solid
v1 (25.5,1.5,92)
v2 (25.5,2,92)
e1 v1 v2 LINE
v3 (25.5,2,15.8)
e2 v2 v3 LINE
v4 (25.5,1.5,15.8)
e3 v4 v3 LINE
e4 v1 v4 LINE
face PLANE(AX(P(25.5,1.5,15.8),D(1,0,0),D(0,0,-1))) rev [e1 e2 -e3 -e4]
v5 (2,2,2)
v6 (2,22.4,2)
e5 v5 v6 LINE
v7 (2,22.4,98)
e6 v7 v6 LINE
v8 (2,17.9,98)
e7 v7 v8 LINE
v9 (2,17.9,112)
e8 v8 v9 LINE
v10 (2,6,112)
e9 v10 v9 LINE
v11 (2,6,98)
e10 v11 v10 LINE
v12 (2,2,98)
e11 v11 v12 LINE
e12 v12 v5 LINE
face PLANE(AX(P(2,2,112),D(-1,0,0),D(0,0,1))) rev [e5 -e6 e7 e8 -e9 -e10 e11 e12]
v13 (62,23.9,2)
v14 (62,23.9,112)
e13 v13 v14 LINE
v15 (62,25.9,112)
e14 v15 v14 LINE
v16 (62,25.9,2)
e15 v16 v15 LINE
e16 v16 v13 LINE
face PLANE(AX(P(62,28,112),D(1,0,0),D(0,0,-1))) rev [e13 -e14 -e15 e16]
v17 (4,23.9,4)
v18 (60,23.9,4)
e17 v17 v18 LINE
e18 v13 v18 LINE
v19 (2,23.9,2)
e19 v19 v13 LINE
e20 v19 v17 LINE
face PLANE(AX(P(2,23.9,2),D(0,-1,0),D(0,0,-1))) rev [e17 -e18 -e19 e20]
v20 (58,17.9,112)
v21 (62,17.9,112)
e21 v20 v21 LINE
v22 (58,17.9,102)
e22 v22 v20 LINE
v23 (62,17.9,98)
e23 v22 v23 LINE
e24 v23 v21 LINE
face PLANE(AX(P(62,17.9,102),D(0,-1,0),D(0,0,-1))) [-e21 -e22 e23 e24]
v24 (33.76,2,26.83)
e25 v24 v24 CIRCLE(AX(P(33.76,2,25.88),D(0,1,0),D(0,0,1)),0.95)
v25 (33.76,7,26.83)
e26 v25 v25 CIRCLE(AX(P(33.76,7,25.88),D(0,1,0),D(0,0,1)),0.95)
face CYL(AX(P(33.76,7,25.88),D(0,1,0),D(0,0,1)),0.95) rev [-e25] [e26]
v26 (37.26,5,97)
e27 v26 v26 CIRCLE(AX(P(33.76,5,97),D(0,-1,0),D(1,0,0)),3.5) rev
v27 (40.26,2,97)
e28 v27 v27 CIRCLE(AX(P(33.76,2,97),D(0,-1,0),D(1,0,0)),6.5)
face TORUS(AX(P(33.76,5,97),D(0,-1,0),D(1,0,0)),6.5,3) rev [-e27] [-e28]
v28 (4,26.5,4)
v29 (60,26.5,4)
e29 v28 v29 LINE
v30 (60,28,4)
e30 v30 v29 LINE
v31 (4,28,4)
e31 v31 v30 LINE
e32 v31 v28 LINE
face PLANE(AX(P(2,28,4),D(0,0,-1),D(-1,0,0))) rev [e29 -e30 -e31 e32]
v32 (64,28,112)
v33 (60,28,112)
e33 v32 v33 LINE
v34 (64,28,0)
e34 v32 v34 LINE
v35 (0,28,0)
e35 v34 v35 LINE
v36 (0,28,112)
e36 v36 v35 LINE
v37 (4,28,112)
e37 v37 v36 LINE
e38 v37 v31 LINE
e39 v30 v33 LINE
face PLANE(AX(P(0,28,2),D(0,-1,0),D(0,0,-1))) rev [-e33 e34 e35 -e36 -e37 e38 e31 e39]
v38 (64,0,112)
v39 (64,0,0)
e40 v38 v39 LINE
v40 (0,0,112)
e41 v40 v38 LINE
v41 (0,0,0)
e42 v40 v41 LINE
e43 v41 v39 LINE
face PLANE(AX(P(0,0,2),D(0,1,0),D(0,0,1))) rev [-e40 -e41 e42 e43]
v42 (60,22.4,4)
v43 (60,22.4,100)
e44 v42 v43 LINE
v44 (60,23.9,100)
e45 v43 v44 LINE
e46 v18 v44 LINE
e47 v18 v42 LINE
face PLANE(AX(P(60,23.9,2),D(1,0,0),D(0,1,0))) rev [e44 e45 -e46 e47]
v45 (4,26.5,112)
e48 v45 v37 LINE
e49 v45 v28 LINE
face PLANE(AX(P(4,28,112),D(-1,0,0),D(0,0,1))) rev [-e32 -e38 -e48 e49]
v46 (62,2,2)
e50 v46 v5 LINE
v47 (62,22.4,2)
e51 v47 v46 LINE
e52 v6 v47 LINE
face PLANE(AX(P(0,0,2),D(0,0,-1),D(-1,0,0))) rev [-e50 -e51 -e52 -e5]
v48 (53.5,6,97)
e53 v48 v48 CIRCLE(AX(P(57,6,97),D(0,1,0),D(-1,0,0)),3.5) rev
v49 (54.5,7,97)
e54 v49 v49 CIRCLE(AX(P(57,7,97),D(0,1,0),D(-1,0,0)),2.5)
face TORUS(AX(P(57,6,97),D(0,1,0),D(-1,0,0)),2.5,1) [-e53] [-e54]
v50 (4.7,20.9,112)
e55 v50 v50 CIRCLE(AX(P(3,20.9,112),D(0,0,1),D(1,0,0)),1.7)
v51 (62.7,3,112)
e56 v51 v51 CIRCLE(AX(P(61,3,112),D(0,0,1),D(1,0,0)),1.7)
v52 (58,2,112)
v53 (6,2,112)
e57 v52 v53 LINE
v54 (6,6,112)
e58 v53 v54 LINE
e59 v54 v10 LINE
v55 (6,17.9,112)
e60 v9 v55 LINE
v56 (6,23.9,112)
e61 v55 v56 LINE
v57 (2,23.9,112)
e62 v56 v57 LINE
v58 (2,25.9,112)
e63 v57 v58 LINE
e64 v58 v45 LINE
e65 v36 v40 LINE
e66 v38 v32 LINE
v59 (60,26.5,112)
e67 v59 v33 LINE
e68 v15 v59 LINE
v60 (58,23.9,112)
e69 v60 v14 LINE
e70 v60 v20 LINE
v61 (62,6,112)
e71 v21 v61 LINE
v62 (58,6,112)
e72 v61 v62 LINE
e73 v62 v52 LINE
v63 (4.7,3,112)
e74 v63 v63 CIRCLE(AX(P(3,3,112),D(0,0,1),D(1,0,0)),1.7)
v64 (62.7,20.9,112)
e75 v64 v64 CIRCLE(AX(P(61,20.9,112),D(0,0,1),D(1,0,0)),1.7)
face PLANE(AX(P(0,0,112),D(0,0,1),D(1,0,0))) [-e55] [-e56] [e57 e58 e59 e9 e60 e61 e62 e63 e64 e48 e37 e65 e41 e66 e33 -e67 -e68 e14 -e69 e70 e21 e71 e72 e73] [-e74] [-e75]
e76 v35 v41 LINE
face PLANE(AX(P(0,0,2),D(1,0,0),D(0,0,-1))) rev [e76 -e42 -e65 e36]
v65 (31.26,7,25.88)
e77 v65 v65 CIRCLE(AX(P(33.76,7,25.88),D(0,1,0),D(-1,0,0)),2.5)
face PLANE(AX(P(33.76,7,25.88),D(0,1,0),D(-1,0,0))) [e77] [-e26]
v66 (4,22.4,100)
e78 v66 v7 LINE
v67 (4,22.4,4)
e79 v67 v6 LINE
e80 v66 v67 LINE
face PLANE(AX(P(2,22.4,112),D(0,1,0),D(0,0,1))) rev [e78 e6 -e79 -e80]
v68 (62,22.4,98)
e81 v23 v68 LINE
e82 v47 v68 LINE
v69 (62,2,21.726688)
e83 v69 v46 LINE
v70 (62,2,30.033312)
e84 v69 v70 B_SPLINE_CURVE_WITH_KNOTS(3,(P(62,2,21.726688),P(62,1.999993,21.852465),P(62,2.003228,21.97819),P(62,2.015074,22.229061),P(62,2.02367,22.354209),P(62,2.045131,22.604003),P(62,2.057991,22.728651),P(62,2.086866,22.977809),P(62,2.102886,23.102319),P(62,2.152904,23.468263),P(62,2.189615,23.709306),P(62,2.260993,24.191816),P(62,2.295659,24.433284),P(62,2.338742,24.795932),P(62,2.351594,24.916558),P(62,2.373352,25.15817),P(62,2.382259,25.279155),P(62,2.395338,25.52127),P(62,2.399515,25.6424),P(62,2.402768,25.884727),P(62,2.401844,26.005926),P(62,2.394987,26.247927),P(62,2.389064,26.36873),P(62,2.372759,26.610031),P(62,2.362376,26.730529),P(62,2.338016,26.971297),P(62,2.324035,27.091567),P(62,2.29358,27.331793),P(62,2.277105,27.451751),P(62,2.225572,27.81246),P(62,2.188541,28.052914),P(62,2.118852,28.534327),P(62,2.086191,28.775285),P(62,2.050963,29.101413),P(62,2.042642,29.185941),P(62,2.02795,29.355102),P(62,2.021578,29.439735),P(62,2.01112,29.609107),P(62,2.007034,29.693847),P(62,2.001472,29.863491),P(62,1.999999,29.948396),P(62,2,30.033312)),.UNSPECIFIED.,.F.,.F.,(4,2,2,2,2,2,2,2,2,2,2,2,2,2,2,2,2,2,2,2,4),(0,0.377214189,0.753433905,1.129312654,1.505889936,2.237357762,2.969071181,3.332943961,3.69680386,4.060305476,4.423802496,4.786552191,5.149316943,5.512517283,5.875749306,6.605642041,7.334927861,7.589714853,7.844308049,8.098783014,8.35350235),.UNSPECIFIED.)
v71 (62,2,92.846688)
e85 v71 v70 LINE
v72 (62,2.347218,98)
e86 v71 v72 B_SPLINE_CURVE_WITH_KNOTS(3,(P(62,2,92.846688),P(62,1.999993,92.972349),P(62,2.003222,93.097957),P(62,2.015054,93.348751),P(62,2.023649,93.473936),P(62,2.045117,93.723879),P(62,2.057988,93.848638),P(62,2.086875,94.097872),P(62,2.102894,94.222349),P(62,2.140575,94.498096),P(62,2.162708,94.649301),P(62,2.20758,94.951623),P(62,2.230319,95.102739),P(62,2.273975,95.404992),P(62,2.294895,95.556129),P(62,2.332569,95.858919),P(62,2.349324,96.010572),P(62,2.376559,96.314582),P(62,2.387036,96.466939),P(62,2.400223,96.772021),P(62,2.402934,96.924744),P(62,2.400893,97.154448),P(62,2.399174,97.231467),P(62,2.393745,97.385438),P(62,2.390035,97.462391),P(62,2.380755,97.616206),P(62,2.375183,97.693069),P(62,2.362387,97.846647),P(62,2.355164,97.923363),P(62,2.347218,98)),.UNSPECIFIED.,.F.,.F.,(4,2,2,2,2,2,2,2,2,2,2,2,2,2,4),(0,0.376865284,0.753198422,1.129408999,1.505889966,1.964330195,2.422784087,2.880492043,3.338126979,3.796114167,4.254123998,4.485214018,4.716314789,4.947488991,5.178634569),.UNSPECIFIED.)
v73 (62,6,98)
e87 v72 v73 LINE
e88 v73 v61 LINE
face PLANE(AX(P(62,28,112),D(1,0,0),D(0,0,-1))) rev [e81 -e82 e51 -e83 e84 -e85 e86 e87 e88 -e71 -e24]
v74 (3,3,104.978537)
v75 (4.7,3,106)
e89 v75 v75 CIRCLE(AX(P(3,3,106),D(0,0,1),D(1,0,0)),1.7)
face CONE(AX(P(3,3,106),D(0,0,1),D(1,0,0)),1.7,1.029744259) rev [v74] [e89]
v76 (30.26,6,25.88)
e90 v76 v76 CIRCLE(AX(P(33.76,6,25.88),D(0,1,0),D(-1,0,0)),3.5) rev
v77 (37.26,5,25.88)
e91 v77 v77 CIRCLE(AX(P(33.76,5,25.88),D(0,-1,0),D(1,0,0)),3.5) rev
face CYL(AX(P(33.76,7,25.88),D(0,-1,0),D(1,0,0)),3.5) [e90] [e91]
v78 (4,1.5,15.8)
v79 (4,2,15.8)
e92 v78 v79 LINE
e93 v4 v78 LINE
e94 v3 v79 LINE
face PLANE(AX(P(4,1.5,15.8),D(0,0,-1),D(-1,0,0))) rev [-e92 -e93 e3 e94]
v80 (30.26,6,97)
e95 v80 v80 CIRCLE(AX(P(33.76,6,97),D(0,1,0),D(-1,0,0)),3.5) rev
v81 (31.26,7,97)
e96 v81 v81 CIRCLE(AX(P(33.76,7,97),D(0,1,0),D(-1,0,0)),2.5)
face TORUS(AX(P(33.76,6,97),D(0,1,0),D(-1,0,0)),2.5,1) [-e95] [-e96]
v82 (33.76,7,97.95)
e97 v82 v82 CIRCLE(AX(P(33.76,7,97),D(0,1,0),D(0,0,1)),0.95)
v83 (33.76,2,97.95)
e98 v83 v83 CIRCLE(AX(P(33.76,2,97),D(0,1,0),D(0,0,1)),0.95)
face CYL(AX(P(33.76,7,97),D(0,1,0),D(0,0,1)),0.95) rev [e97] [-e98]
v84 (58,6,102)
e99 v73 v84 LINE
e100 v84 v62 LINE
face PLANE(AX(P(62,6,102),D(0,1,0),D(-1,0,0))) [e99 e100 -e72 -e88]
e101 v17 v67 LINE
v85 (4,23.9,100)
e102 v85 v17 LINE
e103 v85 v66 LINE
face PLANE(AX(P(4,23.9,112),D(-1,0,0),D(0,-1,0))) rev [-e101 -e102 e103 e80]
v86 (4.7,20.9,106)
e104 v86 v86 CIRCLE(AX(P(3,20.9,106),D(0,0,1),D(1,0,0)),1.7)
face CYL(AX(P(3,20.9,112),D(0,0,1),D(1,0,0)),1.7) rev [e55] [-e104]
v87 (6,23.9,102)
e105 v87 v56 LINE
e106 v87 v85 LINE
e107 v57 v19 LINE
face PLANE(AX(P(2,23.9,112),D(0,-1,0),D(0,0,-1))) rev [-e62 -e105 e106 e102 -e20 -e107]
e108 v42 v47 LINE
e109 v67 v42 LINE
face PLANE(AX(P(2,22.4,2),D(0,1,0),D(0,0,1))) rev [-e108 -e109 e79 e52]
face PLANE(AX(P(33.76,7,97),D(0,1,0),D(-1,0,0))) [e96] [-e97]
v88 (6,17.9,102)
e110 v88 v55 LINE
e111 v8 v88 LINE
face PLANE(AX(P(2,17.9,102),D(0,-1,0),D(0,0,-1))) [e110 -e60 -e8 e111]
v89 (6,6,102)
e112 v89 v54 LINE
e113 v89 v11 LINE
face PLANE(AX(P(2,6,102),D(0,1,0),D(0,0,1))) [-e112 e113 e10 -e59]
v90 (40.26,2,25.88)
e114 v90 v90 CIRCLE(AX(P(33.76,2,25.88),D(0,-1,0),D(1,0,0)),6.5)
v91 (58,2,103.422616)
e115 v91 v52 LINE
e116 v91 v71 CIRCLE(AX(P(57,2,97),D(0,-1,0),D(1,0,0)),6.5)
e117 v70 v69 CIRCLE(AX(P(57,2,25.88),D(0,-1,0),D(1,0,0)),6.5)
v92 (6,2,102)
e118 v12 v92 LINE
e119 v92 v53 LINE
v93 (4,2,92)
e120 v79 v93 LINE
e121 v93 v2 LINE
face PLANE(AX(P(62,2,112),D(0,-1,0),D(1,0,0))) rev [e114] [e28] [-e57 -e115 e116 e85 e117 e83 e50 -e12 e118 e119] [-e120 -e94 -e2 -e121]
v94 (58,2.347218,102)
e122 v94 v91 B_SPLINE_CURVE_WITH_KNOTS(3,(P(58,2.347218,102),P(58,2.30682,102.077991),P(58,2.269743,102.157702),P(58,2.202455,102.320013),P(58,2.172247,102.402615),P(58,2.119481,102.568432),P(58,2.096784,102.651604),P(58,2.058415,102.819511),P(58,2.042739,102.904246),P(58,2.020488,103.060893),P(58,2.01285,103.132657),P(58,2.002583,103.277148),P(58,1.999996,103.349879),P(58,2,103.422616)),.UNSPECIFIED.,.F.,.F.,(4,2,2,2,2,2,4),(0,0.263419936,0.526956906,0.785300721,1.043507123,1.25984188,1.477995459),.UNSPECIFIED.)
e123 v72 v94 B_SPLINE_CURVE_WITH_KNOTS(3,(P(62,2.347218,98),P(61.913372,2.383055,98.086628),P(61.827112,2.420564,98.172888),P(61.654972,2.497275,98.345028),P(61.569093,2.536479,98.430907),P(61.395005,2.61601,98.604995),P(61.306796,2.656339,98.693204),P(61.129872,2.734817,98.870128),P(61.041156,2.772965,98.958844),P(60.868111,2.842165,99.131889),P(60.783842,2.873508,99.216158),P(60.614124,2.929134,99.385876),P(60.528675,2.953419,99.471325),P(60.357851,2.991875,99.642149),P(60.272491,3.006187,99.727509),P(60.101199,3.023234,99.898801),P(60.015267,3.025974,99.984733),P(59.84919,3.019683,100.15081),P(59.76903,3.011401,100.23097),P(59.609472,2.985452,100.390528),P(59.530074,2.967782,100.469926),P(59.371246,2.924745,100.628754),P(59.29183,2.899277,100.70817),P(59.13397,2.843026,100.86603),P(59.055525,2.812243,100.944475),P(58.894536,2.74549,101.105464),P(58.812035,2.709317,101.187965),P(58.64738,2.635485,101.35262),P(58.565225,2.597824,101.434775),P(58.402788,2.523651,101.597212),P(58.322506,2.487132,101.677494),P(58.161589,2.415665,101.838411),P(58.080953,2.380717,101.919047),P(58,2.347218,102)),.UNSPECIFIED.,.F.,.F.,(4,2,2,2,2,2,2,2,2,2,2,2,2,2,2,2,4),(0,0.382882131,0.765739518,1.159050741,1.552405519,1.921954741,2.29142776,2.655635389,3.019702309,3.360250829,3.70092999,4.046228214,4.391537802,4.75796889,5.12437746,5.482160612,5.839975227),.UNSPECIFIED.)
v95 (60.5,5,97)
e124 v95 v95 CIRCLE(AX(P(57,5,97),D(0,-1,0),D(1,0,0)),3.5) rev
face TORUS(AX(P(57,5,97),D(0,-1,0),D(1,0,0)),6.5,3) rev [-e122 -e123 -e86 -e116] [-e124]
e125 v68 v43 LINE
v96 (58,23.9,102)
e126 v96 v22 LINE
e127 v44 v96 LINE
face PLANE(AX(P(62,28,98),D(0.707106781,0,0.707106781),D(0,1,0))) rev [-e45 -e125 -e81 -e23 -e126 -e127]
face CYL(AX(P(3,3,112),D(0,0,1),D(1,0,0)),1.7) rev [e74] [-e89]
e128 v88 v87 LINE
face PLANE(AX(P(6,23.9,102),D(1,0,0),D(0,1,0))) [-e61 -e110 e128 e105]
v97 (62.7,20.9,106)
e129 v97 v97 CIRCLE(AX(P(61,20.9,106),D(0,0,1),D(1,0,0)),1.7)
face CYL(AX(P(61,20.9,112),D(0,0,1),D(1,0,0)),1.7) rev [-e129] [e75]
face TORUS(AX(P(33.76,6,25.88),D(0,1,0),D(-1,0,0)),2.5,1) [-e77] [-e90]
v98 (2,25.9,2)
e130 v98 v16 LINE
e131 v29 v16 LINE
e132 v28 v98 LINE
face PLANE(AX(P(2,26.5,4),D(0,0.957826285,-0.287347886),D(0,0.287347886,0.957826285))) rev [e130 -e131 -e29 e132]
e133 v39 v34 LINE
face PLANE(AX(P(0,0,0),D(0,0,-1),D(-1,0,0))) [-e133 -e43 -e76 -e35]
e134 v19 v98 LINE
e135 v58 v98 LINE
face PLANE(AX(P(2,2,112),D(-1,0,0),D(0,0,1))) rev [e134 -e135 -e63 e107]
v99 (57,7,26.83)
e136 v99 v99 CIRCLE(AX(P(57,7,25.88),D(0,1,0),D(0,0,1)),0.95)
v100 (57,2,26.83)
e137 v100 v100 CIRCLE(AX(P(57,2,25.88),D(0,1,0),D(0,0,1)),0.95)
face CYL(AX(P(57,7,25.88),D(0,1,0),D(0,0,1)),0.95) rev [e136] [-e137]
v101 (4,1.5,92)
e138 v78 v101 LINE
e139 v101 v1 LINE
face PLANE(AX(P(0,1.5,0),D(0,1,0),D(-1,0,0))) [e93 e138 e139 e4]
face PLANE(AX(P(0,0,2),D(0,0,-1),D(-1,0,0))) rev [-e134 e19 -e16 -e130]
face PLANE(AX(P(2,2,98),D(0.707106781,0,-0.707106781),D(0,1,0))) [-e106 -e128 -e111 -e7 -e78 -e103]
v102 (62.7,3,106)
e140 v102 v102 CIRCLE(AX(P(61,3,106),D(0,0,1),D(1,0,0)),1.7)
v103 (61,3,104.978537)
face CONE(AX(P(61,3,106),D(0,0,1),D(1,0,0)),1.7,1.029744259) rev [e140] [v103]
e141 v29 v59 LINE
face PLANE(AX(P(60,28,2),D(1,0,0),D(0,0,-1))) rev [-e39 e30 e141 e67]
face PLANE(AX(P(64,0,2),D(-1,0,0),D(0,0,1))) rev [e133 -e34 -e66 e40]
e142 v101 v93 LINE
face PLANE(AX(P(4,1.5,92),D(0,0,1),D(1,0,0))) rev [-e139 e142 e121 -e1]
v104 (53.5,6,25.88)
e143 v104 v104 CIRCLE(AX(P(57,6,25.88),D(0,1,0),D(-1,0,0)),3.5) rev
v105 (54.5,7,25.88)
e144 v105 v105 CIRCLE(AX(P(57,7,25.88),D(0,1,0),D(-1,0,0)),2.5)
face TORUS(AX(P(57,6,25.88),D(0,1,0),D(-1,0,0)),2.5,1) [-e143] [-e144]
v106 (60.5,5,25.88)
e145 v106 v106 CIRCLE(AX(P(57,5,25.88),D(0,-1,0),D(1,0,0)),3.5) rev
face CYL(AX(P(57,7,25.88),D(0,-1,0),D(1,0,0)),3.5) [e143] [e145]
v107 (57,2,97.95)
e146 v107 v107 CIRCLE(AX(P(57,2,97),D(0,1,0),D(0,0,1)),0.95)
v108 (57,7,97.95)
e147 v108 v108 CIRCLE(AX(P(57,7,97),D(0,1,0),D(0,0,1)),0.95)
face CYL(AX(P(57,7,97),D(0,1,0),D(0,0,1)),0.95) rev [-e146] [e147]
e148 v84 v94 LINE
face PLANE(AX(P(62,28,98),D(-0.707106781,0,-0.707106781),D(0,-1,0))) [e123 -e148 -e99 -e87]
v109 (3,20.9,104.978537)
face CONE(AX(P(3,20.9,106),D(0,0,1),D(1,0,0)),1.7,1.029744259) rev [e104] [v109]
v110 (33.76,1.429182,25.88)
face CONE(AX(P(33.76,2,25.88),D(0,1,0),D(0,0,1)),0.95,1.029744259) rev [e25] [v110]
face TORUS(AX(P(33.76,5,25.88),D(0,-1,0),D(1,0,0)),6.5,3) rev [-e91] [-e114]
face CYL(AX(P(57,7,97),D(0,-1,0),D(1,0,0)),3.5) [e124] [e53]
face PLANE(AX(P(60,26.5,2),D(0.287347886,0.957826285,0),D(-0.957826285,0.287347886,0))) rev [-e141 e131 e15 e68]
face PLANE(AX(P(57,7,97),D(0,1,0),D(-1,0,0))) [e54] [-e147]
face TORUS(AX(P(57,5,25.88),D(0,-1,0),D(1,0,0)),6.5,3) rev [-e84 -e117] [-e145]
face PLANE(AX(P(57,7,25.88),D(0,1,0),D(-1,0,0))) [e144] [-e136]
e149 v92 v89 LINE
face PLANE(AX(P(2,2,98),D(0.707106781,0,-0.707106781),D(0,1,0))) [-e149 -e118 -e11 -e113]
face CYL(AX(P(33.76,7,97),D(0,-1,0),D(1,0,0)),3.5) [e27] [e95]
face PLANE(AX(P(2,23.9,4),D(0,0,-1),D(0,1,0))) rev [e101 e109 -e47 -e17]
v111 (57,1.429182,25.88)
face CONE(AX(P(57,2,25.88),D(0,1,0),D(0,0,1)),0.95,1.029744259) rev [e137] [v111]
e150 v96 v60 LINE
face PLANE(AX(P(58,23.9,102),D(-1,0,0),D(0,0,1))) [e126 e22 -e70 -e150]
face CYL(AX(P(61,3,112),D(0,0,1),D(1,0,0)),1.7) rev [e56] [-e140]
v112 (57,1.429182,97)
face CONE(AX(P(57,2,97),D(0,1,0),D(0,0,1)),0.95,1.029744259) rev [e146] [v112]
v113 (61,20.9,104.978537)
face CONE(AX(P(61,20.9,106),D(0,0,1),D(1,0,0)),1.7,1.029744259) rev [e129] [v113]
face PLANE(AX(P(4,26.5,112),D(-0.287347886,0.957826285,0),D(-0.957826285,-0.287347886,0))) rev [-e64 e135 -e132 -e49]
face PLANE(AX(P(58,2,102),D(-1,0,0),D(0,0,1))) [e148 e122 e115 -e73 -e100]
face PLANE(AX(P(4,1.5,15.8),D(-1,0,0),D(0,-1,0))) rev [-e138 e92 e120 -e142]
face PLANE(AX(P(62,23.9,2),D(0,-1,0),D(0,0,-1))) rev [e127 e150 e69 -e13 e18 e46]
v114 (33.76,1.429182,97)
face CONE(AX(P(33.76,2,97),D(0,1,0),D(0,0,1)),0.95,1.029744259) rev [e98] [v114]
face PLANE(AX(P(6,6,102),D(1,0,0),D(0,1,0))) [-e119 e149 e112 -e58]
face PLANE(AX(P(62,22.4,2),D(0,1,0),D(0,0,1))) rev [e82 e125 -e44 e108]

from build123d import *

# Parameters (mm, degrees)
SKIZZE1_W                            = 64
SKIZZE1_H                            = 28
AUFSATZ_LINEAR_AUSTRAGEN1_DEPTH      = 2
AUFSATZ_LINEAR_AUSTRAGEN2_DEPTH      = 110
AUSTRAGUNG1_OUTLINE_W                = 56
AUSTRAGUNG1_OUTLINE_H                = 1.5
AUSTRAGUNG1_DEPTH                    = 4
AUSTRAGUNG1_2_OUTLINE_W              = 2
AUSTRAGUNG1_2_OUTLINE_H              = 1.5
AUSTRAGUNG1_2_DEPTH                  = 112
AUSTRAGUNG1_START                    = 1
AUSTRAGUNG1_3_DEPTH                  = 62
SKIZZE8_W                            = 4
SKIZZE8_H                            = 4
SKIZZE8_H_2                          = 6
AUFSATZ_LINEAR_AUSTRAGEN4_DEPTH      = 10
F_3_4_3_4_DURCHMESSER_BOHRUNG1_D     = 3.4
F_3_4_3_4_DURCHMESSER_BOHRUNG1_DEPTH = 6
F_3_4_3_4_DURCHMESSER_BOHRUNG1_TIP   = 1.021463052
FASE1_SIZE                           = 4
SKIZZE11_W                           = 21.5
SKIZZE11_H                           = 76.2
SCHNITT_LINEAR_AUSTRAGEN1_DEPTH      = 0.5
SKIZZE12_R                           = 3.5
AUFSATZ_LINEAR_AUSTRAGEN5_DEPTH      = 5
F_1_9_1_9_DURCHMESSER_BOHRUNG2_D     = 1.9
F_1_9_1_9_DURCHMESSER_BOHRUNG2_DEPTH = 5
F_1_9_1_9_DURCHMESSER_BOHRUNG2_TIP   = 0.570817588
VERRUNDUNG1_R                        = 3
VERRUNDUNG2_R                        = 1


with BuildPart() as part:
    # Skizze1 → Aufsatz-Linear austragen1 (new body)
    with BuildSketch(Plane.XY):
        with Locations((32, 14)):
            Rectangle(SKIZZE1_W, SKIZZE1_H)
    extrude(amount=AUFSATZ_LINEAR_AUSTRAGEN1_DEPTH)

    # Skizze2 → Aufsatz-Linear austragen2 (add)
    with BuildSketch(Plane.XY.offset(2)):
        Polygon((0, 28), (0, 0), (64, 0), (64, 28), (62, 28), (62, 2), (2, 2), (2, 28), align=None)
    extrude(amount=AUFSATZ_LINEAR_AUSTRAGEN2_DEPTH)

    # Austragung1: read off the stored shape, not the designer's step
    # Austragung1 outline → Austragung1 (add)
    with BuildSketch(Plane.XY):
        with Locations((32, 23.15)):
            Rectangle(AUSTRAGUNG1_OUTLINE_W, AUSTRAGUNG1_OUTLINE_H)
    extrude(amount=AUSTRAGUNG1_DEPTH)

    # Austragung1 2 outline → Austragung1 2 (add)
    with BuildSketch(Plane.XY):
        Polygon((4, 28), (2, 28), (2, 25.9), (4, 26.5), align=None)
        Polygon((62, 28), (60, 28), (60, 26.5), (62, 25.9), align=None)
        with Locations((3, 23.15)):
            Rectangle(AUSTRAGUNG1_2_OUTLINE_W, AUSTRAGUNG1_2_OUTLINE_H)
        with Locations((61, 23.15)):
            Rectangle(AUSTRAGUNG1_2_OUTLINE_W, AUSTRAGUNG1_2_OUTLINE_H)
    extrude(amount=AUSTRAGUNG1_2_DEPTH)

    # Austragung1 3 outline → Austragung1 3 (add)
    with BuildSketch(Plane.YZ.offset(AUSTRAGUNG1_START)):
        Polygon((28, 4), (26.5, 4), (25.9, 2), (28, 2), align=None)
    extrude(amount=AUSTRAGUNG1_3_DEPTH)

    # Skizze8 → Aufsatz-Linear austragen4 (add)
    with BuildSketch(Plane.XY.offset(112)):
        with Locations((4, 4)):
            Rectangle(SKIZZE8_W, SKIZZE8_H)
        with Locations((60, 4)):
            Rectangle(SKIZZE8_W, SKIZZE8_H)
        with Locations((60, 20.9)):
            Rectangle(SKIZZE8_W, SKIZZE8_H_2)
        with Locations((4, 20.9)):
            Rectangle(SKIZZE8_W, SKIZZE8_H_2)
    extrude(amount=-AUFSATZ_LINEAR_AUSTRAGEN4_DEPTH)

    # Ø3.4 (3.4) Durchmesser Bohrung1
    with Locations(Plane.XY.offset(112)):
        with Locations((3, 20.9), (3, 3), (61, 20.9), (61, 3)):
            Hole(F_3_4_3_4_DURCHMESSER_BOHRUNG1_D / 2, depth=F_3_4_3_4_DURCHMESSER_BOHRUNG1_DEPTH)
            with Locations((0, 0, -(F_3_4_3_4_DURCHMESSER_BOHRUNG1_DEPTH + F_3_4_3_4_DURCHMESSER_BOHRUNG1_TIP / 2))):  # 118° drill point
                Cone(0, F_3_4_3_4_DURCHMESSER_BOHRUNG1_D / 2, F_3_4_3_4_DURCHMESSER_BOHRUNG1_TIP, mode=Mode.SUBTRACT)

    # Fase1
    fase1_edges = [part.edges().sort_by_distance(p)[0] for p in [
        (2, 20.15, 102),
        (2, 4, 102),
        (62, 20.15, 102),
        (62, 4, 102),
    ]]
    chamfer(fase1_edges, length=FASE1_SIZE - 0.0001)  # a hair under: the kernel refuses the full size

    # Skizze11 → Schnitt-Linear austragen1 (cut)
    with BuildSketch(Plane(origin=(0, 2, 0), x_dir=(1, 0, 0), z_dir=(0, 1, 0))):
        with Locations((14.75, -53.9)):
            Rectangle(SKIZZE11_W, SKIZZE11_H)
    extrude(amount=-SCHNITT_LINEAR_AUSTRAGEN1_DEPTH, mode=Mode.SUBTRACT)

    # Skizze12 → Aufsatz-Linear austragen5 (add)
    with BuildSketch(Plane(origin=(0, 2, 0), x_dir=(1, 0, 0), z_dir=(0, 1, 0))):
        with Locations((57, -97)):
            Circle(SKIZZE12_R)
        with Locations((33.76, -97)):
            Circle(SKIZZE12_R)
        with Locations((33.76, -25.88)):
            Circle(SKIZZE12_R)
        with Locations((57, -25.88)):
            Circle(SKIZZE12_R)
    extrude(amount=AUFSATZ_LINEAR_AUSTRAGEN5_DEPTH)

    # Ø1.9 (1.9) Durchmesser Bohrung2
    with Locations(Plane(origin=(0, 7, 0), x_dir=(1, 0, 0), z_dir=(0, 1, 0))):
        with Locations((33.76, -25.88), (57, -25.88), (57, -97), (33.76, -97)):
            Hole(F_1_9_1_9_DURCHMESSER_BOHRUNG2_D / 2, depth=F_1_9_1_9_DURCHMESSER_BOHRUNG2_DEPTH)
            with Locations((0, 0, -(F_1_9_1_9_DURCHMESSER_BOHRUNG2_DEPTH + F_1_9_1_9_DURCHMESSER_BOHRUNG2_TIP / 2))):  # 118° drill point
                Cone(0, F_1_9_1_9_DURCHMESSER_BOHRUNG2_D / 2, F_1_9_1_9_DURCHMESSER_BOHRUNG2_TIP, mode=Mode.SUBTRACT)

    # Verrundung1
    # the kernel refuses this fillet: 3 mm, written as the material it adds along each edge
    with BuildSketch(Plane(origin=(57, 2, 97), x_dir=(1, 0, 0), z_dir=(0, 0, 1))) as verrundung1_piece_1:
        with BuildLine():
            CenterArc((3.5 + VERRUNDUNG1_R, VERRUNDUNG1_R), VERRUNDUNG1_R, 180, 90)
            Line((3.5, VERRUNDUNG1_R), (3.5, 0))
            Line((3.5, 0), (3.5 + VERRUNDUNG1_R, 0))
        make_face()
    revolve(axis=Axis((57, 2, 97), (0, 1, 0)))
    with BuildSketch(Plane(origin=(33.76, 2, 97), x_dir=(1, 0, 0), z_dir=(0, 0, 1))) as verrundung1_piece_2:
        with BuildLine():
            CenterArc((3.5 + VERRUNDUNG1_R, VERRUNDUNG1_R), VERRUNDUNG1_R, 180, 90)
            Line((3.5, VERRUNDUNG1_R), (3.5, 0))
            Line((3.5, 0), (3.5 + VERRUNDUNG1_R, 0))
        make_face()
    revolve(axis=Axis((33.76, 2, 97), (0, 1, 0)))
    with BuildSketch(Plane(origin=(57, 2, 25.88), x_dir=(1, 0, 0), z_dir=(0, 0, 1))) as verrundung1_piece_3:
        with BuildLine():
            CenterArc((3.5 + VERRUNDUNG1_R, VERRUNDUNG1_R), VERRUNDUNG1_R, 180, 90)
            Line((3.5, VERRUNDUNG1_R), (3.5, 0))
            Line((3.5, 0), (3.5 + VERRUNDUNG1_R, 0))
        make_face()
    revolve(axis=Axis((57, 2, 25.88), (0, 1, 0)))
    with BuildSketch(Plane(origin=(33.76, 2, 25.88), x_dir=(1, 0, 0), z_dir=(0, 0, 1))) as verrundung1_piece_4:
        with BuildLine():
            CenterArc((3.5 + VERRUNDUNG1_R, VERRUNDUNG1_R), VERRUNDUNG1_R, 180, 90)
            Line((3.5, VERRUNDUNG1_R), (3.5, 0))
            Line((3.5, 0), (3.5 + VERRUNDUNG1_R, 0))
        make_face()
    revolve(axis=Axis((33.76, 2, 25.88), (0, 1, 0)))

    # Verrundung2
    verrundung2_edges = [part.edges().sort_by_distance(p)[0] for p in [
        (53.5, 7, 25.88),
        (30.26, 7, 25.88),
        (30.26, 7, 97),
        (53.5, 7, 97),
    ]]
    fillet(verrundung2_edges, radius=VERRUNDUNG2_R)


solid = part.part
